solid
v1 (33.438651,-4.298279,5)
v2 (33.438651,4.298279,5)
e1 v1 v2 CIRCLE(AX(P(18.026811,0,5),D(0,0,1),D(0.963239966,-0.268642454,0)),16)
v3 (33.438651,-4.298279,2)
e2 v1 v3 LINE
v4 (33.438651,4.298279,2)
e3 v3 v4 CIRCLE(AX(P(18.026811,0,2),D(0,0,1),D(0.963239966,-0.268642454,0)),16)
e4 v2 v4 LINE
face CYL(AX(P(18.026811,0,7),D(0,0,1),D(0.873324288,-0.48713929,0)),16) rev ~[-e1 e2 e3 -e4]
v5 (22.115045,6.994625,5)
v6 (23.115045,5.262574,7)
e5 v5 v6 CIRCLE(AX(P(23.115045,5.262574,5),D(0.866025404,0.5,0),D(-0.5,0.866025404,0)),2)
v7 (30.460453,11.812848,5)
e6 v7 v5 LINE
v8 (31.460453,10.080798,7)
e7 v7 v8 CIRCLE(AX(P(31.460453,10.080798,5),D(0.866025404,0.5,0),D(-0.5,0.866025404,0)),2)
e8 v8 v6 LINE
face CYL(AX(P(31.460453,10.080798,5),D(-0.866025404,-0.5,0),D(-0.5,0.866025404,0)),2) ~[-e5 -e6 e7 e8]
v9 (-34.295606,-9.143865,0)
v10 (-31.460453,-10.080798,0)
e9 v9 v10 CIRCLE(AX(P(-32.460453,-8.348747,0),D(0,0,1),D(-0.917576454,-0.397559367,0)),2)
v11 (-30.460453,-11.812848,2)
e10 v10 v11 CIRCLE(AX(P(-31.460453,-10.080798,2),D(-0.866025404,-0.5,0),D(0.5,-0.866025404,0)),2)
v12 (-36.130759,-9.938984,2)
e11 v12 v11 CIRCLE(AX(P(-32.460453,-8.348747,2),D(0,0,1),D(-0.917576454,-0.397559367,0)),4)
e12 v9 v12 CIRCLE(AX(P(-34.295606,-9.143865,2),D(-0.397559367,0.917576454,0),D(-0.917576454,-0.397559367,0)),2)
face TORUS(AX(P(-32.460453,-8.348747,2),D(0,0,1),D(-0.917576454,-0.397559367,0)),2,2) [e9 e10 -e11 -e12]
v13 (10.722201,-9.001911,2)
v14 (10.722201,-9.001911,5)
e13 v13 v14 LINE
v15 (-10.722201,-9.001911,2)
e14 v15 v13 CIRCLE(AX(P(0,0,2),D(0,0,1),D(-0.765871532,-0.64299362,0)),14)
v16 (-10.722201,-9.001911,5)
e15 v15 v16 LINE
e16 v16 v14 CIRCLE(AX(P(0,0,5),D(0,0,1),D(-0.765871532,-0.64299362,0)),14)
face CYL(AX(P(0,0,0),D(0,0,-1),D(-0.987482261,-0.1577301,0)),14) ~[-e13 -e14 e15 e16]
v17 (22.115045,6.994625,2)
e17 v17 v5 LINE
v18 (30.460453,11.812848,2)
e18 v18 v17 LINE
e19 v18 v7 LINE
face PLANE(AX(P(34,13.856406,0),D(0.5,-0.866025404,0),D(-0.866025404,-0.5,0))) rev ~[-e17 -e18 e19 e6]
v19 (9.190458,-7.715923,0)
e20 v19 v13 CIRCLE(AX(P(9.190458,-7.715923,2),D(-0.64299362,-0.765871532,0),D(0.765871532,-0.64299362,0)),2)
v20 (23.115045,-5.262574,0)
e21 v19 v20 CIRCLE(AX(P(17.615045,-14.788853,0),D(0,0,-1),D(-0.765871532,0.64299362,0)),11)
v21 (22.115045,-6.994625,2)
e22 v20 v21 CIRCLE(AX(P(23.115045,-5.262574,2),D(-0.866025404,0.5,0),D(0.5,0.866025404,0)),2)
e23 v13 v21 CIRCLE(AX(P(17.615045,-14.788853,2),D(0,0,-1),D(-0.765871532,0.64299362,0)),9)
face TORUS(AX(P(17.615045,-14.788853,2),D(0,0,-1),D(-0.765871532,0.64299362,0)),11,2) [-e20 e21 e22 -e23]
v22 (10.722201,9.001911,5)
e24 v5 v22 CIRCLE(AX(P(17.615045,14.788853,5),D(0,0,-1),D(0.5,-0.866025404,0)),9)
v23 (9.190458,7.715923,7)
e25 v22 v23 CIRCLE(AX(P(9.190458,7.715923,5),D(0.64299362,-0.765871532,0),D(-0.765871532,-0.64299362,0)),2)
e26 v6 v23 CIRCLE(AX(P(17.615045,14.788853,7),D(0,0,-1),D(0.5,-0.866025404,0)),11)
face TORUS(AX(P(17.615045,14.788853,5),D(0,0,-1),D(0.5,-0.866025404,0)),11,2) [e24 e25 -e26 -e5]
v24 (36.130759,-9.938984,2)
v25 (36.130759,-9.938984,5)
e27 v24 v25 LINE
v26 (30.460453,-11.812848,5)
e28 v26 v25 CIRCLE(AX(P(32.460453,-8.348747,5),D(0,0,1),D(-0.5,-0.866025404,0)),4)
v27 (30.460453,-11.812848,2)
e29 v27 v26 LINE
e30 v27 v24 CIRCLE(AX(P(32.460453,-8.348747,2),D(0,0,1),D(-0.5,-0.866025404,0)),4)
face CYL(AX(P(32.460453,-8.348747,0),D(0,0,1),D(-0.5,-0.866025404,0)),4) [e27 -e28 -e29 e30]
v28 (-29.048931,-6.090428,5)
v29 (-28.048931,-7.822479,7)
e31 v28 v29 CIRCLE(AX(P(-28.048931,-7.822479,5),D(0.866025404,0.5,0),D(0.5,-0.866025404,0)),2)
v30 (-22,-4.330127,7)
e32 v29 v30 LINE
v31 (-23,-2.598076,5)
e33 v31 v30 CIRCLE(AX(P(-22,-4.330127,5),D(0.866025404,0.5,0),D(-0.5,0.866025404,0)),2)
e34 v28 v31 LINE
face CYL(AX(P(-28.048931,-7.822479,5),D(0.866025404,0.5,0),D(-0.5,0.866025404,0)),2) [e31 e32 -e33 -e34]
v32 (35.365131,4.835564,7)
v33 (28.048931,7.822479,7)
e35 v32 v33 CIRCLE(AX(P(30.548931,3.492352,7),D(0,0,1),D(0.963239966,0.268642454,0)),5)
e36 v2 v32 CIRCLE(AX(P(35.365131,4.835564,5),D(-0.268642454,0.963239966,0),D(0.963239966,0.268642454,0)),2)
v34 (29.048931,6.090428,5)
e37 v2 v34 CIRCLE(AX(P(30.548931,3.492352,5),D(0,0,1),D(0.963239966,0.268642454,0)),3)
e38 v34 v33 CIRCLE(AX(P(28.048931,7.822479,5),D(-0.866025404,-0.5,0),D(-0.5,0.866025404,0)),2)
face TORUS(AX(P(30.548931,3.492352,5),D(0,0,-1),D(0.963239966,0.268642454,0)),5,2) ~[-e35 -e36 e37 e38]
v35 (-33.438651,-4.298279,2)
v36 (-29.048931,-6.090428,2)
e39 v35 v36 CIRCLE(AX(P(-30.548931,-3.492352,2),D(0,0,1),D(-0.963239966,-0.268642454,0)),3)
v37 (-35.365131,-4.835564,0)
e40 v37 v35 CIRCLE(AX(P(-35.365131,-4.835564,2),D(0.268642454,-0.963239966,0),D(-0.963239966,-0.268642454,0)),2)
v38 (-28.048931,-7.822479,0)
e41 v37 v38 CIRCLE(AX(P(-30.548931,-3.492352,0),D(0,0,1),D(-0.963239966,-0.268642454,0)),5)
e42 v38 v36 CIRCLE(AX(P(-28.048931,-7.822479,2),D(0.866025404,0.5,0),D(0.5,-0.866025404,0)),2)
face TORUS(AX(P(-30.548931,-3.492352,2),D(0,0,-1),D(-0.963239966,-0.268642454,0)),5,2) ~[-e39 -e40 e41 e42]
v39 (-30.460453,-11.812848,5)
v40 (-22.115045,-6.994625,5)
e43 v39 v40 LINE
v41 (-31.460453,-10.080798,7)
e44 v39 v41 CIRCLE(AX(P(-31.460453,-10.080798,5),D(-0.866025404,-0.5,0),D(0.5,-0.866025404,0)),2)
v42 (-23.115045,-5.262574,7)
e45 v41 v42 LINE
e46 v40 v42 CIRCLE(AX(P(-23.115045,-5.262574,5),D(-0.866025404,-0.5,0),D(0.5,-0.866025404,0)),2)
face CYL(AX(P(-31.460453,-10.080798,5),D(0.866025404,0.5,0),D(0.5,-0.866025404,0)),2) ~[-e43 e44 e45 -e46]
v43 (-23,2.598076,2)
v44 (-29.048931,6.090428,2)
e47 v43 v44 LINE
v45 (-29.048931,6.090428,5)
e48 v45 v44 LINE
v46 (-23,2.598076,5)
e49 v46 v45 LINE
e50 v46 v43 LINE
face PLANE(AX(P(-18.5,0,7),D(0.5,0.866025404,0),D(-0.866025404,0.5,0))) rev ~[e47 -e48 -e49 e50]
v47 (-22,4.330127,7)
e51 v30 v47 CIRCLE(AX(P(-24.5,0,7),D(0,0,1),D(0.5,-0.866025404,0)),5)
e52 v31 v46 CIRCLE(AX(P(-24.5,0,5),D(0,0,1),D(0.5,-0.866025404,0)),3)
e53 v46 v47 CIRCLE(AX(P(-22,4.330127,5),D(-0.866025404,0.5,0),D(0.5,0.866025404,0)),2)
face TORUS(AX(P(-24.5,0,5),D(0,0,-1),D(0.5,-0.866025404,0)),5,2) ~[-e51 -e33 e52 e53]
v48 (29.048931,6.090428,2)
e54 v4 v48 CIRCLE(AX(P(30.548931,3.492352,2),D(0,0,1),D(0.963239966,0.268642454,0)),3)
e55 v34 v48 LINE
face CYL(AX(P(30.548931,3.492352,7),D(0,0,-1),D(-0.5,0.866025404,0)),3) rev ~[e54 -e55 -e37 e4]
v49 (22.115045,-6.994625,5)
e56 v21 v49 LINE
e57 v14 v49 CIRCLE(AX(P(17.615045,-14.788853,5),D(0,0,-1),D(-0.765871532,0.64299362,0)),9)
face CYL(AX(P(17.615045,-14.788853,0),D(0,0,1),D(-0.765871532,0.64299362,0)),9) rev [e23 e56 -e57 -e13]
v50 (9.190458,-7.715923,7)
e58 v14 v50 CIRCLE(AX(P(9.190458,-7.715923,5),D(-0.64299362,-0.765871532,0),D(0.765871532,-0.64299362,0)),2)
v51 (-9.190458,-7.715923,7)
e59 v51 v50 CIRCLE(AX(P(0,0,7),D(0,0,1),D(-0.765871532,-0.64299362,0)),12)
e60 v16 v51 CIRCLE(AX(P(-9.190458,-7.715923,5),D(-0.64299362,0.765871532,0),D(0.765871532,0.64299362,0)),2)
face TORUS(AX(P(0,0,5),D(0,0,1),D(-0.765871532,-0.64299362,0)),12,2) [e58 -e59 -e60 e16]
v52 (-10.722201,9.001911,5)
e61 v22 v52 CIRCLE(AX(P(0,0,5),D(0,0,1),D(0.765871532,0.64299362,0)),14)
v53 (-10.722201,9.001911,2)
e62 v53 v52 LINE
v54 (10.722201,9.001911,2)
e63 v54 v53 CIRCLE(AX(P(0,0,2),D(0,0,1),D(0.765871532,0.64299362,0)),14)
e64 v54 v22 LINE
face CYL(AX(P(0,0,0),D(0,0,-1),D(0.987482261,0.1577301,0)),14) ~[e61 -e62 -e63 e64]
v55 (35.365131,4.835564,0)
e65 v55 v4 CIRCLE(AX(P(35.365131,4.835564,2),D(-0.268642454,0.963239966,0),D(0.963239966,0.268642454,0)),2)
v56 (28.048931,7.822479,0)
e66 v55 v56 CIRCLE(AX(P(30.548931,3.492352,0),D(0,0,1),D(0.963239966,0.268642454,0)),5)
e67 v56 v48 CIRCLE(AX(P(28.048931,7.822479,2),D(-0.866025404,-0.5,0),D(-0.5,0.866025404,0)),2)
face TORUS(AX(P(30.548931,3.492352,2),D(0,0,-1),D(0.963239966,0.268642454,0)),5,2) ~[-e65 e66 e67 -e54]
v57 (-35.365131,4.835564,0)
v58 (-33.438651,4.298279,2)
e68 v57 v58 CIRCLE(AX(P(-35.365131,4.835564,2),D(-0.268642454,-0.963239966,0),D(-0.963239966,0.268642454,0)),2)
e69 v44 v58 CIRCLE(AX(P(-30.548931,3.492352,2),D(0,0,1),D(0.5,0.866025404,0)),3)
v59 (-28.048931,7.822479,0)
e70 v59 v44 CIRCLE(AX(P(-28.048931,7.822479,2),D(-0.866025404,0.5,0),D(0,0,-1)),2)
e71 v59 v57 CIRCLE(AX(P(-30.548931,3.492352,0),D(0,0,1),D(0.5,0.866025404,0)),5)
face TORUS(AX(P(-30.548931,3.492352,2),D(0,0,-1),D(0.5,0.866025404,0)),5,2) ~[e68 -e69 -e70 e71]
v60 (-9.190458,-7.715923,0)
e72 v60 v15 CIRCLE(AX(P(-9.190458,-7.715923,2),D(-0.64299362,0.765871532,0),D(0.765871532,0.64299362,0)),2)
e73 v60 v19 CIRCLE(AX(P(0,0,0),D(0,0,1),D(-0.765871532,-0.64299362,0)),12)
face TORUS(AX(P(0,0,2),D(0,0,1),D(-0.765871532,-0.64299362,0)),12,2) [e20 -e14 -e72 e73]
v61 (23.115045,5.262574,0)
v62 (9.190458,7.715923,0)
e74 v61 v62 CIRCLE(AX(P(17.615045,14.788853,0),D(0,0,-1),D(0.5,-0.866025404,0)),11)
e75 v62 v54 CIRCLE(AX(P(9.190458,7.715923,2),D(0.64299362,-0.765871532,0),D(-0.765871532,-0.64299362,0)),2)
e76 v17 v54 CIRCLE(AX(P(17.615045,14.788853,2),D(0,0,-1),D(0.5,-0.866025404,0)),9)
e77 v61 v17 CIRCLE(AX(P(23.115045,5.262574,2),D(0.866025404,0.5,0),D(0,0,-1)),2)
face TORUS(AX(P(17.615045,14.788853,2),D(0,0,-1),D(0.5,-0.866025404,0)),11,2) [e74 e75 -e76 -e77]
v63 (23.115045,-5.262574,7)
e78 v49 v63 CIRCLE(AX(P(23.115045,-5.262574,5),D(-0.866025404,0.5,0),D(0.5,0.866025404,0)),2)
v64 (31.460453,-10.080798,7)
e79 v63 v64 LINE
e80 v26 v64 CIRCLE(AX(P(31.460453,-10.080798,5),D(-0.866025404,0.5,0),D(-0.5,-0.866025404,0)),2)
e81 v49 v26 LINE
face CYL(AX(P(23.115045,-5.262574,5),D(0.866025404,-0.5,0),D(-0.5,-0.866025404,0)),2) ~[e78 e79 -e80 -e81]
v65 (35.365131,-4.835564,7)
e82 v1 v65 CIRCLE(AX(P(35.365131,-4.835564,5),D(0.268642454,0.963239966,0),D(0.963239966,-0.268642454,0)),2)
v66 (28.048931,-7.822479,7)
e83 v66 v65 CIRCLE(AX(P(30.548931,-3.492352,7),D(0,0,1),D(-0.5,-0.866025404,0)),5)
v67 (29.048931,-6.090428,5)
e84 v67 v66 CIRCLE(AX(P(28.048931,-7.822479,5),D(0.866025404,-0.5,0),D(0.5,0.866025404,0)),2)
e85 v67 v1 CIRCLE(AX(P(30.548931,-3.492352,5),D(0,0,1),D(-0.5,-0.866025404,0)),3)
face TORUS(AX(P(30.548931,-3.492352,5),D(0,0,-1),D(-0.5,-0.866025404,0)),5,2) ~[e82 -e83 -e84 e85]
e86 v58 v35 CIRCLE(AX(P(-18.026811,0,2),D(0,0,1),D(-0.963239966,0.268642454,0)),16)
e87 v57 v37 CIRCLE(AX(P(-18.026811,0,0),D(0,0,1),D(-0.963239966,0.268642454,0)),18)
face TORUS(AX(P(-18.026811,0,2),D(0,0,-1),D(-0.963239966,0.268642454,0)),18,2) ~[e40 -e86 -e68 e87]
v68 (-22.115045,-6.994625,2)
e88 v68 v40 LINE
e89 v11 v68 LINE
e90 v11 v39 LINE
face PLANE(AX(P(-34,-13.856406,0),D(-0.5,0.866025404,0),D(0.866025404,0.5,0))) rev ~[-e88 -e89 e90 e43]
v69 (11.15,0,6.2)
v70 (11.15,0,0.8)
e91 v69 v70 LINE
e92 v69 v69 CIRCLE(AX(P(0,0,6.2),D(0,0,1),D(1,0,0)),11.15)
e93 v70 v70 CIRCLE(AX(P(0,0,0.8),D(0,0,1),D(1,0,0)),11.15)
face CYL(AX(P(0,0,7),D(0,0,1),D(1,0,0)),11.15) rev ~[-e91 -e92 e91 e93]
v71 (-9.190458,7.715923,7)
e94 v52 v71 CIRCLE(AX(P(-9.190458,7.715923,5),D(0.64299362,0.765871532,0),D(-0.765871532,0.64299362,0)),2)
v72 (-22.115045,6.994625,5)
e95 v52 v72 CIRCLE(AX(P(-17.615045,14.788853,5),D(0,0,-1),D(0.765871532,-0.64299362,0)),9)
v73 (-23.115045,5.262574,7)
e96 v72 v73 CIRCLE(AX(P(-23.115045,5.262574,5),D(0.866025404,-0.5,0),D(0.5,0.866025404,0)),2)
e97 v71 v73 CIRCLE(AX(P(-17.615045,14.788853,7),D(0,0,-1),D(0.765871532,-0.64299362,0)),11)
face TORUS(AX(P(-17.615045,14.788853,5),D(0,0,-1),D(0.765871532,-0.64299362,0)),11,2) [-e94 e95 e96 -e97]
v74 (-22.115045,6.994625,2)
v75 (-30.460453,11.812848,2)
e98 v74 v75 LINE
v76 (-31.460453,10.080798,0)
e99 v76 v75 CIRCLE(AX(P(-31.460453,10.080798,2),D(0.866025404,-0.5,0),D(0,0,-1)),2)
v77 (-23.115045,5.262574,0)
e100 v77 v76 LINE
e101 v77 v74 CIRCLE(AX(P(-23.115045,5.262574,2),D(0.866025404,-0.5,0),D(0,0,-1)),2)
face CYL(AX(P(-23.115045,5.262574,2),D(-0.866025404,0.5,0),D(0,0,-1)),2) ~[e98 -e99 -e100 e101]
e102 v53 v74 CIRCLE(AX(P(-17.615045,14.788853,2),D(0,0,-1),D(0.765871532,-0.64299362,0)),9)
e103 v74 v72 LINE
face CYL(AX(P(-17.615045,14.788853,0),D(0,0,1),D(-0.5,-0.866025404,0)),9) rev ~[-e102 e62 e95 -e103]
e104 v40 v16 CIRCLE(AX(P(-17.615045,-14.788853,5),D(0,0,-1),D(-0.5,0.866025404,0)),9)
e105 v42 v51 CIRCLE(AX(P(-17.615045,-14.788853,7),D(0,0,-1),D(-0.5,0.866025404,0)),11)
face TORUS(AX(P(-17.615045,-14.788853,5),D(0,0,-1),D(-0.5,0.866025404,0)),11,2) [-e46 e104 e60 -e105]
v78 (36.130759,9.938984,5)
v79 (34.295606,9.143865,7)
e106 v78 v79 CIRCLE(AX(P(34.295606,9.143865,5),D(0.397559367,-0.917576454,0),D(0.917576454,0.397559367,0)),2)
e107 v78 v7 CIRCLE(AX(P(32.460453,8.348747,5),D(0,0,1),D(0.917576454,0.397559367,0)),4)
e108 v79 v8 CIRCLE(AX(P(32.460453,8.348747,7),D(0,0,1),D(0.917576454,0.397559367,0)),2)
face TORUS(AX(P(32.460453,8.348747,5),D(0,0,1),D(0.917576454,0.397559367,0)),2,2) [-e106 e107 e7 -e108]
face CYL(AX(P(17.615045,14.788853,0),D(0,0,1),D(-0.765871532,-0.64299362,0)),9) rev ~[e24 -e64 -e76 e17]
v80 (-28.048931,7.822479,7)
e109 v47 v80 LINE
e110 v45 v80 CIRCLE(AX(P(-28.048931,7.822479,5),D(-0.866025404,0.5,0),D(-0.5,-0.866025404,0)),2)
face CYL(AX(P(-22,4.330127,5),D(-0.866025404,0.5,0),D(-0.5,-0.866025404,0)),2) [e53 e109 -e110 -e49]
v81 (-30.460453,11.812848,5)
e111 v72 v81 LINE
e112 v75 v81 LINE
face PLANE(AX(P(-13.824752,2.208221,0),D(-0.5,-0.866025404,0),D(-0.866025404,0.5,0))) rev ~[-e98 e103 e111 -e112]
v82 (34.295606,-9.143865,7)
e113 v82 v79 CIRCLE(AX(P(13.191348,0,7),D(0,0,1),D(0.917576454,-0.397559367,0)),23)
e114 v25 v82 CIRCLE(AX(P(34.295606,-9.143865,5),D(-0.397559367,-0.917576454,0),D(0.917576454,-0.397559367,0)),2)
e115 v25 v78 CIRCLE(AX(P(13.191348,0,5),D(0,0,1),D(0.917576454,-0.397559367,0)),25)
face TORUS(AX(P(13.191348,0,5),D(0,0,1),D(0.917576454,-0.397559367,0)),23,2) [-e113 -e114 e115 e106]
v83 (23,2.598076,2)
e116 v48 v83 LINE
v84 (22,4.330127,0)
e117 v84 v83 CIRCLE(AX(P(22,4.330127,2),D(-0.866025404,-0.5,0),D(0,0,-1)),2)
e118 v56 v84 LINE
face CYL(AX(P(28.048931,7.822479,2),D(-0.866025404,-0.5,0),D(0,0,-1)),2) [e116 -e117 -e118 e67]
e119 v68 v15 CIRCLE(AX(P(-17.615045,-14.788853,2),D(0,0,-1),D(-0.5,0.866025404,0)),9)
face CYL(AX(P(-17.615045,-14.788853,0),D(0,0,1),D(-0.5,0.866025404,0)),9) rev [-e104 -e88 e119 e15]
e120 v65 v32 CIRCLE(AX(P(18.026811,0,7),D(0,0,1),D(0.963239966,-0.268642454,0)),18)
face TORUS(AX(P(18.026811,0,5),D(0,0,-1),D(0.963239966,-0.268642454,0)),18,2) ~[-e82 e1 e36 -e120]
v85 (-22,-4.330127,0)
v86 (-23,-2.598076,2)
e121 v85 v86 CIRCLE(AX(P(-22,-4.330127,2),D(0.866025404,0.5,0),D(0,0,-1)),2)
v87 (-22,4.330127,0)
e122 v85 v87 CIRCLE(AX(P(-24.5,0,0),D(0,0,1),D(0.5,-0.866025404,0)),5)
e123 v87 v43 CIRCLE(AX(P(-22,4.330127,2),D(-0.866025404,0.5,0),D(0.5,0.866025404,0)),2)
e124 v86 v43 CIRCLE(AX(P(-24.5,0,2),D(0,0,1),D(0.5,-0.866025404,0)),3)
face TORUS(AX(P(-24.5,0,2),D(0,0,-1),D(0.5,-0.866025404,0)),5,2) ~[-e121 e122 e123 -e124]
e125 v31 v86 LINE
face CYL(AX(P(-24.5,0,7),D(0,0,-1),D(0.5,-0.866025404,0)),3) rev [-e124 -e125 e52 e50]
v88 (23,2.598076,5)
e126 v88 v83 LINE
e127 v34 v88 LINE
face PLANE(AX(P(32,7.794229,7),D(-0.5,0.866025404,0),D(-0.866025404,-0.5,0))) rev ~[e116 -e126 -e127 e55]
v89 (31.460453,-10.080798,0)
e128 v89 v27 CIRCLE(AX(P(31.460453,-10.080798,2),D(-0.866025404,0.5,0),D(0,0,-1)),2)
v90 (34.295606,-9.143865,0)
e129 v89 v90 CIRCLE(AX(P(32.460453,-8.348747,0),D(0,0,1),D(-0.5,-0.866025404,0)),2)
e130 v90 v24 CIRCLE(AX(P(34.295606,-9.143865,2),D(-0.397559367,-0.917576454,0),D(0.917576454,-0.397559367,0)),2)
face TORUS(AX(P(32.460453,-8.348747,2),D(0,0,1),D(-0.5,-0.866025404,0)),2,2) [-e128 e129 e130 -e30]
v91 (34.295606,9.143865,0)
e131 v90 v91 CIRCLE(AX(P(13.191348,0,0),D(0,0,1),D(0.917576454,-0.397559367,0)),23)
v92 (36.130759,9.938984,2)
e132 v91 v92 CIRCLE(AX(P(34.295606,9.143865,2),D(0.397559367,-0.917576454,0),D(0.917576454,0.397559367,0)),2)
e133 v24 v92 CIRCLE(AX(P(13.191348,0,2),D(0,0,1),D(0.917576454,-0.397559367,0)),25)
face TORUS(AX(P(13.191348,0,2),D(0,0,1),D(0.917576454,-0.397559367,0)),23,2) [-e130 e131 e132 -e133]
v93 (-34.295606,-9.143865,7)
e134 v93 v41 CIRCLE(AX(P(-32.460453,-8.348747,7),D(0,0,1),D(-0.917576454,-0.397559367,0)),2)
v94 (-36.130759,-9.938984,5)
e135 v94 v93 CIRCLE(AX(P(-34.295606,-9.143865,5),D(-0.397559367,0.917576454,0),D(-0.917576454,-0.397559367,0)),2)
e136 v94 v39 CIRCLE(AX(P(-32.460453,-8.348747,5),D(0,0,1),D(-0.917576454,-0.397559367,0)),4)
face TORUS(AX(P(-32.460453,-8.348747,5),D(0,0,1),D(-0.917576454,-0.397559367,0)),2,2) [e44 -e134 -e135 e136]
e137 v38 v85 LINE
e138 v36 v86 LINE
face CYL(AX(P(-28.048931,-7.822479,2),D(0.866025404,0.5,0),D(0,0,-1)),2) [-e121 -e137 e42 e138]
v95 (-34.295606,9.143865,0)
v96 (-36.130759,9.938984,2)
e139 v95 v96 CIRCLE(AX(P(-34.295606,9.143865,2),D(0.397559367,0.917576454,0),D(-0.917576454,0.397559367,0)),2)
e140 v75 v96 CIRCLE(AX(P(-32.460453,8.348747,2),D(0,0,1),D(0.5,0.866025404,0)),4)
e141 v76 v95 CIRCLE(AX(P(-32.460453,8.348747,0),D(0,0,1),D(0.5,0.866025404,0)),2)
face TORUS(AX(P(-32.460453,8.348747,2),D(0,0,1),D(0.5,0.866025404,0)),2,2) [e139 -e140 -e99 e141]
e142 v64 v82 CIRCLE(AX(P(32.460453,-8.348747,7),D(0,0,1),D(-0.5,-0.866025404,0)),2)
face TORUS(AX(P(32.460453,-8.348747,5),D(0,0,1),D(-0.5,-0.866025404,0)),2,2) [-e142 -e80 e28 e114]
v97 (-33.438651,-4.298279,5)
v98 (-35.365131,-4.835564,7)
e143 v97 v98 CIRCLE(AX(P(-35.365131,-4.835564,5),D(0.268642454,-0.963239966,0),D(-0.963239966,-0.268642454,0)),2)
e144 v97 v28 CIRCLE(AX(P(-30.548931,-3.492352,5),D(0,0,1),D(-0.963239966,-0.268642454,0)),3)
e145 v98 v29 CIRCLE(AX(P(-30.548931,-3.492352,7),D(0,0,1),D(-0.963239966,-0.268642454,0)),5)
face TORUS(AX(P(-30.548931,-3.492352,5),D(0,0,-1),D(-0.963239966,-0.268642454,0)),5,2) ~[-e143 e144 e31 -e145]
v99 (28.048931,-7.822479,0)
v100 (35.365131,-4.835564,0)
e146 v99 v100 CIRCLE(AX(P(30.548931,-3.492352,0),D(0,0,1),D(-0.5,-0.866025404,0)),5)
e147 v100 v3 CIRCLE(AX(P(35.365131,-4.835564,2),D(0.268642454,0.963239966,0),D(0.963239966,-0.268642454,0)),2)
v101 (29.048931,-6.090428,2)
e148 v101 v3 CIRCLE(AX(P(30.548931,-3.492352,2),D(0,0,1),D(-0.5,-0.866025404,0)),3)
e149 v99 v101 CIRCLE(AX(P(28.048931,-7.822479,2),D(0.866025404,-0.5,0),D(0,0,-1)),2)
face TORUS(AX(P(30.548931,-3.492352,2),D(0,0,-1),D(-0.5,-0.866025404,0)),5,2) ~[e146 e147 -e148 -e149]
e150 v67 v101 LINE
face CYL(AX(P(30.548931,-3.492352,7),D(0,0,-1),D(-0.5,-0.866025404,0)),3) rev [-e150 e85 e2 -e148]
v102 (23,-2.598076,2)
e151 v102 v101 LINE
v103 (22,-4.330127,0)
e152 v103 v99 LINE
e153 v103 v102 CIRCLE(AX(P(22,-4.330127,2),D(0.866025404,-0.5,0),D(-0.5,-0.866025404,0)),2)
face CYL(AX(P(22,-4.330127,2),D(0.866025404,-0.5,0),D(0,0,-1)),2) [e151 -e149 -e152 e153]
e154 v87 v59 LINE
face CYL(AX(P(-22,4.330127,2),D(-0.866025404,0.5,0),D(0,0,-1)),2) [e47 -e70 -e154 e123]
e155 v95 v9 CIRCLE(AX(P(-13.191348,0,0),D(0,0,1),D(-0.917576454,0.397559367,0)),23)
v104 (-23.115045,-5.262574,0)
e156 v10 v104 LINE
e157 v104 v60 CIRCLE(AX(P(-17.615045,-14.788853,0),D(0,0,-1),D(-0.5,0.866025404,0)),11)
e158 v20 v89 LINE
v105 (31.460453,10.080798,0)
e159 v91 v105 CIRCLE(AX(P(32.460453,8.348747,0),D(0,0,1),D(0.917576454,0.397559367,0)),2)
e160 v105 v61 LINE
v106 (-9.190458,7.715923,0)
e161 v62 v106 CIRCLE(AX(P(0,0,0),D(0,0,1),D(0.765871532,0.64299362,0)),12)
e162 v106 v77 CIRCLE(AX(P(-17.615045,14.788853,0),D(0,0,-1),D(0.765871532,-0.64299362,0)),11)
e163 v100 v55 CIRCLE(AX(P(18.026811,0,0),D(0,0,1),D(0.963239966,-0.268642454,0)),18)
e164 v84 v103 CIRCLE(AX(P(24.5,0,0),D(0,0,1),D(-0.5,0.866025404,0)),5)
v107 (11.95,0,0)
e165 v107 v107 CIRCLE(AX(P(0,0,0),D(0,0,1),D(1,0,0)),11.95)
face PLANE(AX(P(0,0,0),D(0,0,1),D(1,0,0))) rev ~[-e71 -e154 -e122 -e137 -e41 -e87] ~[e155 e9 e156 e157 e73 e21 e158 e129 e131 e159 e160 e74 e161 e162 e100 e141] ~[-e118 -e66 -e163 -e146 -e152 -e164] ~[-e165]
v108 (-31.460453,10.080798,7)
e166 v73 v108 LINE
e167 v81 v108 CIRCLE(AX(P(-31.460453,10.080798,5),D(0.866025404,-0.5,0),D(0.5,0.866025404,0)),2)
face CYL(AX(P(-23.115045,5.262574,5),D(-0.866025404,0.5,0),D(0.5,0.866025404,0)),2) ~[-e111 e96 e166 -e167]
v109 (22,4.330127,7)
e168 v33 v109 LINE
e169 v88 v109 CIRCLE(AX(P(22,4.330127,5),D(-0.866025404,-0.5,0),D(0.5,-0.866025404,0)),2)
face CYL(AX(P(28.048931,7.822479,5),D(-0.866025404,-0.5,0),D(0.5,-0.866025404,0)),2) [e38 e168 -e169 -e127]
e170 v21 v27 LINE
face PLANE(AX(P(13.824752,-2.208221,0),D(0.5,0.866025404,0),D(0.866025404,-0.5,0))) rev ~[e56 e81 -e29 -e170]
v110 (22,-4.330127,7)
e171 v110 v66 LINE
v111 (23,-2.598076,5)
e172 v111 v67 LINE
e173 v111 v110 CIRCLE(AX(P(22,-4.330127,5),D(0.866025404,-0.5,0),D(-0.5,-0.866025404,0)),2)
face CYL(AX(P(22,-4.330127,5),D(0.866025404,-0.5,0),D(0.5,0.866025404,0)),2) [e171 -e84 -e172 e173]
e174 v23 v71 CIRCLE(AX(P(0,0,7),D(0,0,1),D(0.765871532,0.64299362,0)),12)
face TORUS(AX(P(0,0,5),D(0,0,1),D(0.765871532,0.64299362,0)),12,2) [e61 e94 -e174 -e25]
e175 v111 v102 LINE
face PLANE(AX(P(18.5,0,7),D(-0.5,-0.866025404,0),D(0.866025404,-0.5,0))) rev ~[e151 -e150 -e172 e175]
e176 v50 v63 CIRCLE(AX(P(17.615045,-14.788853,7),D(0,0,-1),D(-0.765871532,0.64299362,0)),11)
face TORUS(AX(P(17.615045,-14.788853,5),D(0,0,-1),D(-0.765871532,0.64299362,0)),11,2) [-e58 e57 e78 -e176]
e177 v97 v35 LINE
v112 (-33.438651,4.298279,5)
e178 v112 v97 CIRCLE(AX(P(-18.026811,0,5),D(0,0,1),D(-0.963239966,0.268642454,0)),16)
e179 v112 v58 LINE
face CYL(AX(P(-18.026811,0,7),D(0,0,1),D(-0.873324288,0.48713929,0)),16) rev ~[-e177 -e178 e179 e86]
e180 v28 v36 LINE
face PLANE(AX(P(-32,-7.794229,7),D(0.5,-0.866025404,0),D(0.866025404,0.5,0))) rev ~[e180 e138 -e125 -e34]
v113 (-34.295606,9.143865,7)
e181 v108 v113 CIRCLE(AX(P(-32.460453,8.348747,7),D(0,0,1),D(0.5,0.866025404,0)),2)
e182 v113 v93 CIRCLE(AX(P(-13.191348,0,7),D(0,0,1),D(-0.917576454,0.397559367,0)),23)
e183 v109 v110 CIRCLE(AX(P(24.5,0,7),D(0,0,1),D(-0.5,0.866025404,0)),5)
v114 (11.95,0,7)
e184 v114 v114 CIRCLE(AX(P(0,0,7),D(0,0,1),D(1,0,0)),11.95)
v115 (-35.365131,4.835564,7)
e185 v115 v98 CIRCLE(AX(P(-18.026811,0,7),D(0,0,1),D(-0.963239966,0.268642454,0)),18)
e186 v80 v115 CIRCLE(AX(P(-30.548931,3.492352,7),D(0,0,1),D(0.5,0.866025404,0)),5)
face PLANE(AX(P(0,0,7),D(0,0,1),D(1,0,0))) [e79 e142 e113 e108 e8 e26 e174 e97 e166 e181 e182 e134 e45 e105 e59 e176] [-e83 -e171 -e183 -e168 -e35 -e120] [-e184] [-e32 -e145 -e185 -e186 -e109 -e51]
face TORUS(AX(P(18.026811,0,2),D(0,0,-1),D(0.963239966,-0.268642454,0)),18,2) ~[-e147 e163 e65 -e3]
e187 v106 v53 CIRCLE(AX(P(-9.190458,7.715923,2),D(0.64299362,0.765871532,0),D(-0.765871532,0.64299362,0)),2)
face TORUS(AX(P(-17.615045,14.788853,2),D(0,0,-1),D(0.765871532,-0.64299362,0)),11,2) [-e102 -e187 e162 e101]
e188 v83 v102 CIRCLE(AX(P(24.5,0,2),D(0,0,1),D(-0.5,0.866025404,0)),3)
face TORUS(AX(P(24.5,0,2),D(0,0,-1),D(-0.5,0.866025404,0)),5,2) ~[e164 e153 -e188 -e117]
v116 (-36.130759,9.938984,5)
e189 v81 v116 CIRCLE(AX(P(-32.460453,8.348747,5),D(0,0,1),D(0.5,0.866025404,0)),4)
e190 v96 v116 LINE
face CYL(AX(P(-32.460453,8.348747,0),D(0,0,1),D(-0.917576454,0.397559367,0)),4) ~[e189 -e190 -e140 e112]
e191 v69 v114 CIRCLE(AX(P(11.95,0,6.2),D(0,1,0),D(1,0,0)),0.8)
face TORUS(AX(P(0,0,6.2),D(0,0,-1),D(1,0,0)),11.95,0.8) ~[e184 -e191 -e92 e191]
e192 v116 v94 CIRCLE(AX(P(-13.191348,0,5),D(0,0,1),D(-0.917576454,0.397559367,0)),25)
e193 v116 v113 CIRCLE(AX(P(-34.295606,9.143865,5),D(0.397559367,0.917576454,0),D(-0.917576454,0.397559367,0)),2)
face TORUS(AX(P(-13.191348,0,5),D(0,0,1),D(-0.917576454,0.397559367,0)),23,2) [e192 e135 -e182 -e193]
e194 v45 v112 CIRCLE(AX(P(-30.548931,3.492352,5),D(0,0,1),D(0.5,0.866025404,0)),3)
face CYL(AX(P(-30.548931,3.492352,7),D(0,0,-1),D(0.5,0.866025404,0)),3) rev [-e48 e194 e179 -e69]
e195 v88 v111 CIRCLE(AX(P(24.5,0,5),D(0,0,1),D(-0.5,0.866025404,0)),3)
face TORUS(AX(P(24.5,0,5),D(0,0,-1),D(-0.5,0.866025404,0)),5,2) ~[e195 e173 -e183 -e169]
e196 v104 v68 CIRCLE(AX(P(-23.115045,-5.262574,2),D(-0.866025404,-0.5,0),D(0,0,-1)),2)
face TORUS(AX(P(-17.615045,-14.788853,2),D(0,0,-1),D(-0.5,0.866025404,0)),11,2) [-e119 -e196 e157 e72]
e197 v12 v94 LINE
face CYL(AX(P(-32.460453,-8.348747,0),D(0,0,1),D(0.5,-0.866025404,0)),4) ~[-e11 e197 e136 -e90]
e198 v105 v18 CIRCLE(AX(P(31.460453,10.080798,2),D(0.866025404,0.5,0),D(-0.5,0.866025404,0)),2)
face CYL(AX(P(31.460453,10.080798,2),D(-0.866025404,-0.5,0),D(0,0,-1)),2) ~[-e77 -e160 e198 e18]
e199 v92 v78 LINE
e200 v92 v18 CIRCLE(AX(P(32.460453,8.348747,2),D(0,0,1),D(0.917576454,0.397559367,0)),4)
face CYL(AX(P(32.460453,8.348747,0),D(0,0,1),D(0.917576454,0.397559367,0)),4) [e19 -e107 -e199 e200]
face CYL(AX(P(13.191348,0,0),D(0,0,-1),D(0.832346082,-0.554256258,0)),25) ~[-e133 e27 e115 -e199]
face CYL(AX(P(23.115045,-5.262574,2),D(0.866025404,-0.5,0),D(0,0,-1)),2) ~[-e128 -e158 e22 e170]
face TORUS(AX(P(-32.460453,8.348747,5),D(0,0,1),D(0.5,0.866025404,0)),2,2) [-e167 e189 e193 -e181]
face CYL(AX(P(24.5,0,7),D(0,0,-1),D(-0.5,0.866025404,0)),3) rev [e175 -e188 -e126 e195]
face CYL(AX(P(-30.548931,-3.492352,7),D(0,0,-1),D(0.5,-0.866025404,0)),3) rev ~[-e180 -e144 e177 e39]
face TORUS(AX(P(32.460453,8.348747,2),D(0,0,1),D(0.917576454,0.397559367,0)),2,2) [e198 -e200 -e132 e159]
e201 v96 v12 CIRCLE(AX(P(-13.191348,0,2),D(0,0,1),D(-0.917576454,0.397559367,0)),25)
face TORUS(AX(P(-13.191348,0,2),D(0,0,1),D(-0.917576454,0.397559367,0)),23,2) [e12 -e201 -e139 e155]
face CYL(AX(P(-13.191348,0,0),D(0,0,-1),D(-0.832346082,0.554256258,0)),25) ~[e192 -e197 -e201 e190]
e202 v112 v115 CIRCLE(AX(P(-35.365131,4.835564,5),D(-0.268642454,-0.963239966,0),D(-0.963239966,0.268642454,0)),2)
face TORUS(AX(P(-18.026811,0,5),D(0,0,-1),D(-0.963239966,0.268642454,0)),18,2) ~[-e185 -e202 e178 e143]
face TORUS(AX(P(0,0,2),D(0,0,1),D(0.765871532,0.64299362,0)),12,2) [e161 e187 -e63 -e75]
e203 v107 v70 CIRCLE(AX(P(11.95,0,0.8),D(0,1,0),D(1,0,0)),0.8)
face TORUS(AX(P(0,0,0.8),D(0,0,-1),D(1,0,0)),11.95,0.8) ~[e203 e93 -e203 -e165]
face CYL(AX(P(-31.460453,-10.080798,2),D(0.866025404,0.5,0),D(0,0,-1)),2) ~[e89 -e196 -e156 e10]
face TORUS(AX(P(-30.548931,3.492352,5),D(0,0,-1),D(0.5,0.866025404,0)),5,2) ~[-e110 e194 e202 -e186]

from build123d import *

# Parameters (mm, degrees)
F1_DEPTH = 7
F2_R     = 11.15
F3_DEPTH = 7.001
F4_R     = 9
F5_R     = 4
F7_DEPTH = 7.001
F8_R     = 3
F9_R     = 0.8
F10_R    = 2


with BuildPart() as f1:
    # F0 (on Top) → F1 (new body)
    with BuildSketch(Plane.XY):
        with BuildLine():
            Line((-34, -13.8564064606), (-13.8247516529, -2.2082213964))
            ThreePointArc((-13.8247516529, -2.2082213964), (0, -14), (13.8247516529, -2.2082213964))
            Line((13.8247516529, -2.2082213964), (34, -13.8564064606))
            ThreePointArc((34, -13.8564064606), (38.1913479533, 0), (34, 13.8564064606))
            Line((34, 13.8564064606), (13.8247516529, 2.2082213964))
            ThreePointArc((13.8247516529, 2.2082213964), (0, 14), (-13.8247516529, 2.2082213964))
            Line((-13.8247516529, 2.2082213964), (-34, 13.8564064606))
            ThreePointArc((-34, 13.8564064606), (-38.1913479533, 0), (-34, -13.8564064606))
        make_face()
    extrude(amount=F1_DEPTH)

    # F2 (on face) → F3 (cut, through all)
    with BuildSketch(Plane.XY.offset(7)):
        Circle(F2_R)
    extrude(amount=-F3_DEPTH, mode=Mode.SUBTRACT)

    # F4
    f4_edges = [f1.edges().sort_by_distance(p)[0] for p in [
        (-13.824752, -2.208221, 3.5),
        (13.824752, -2.208221, 3.5),
        (13.824752, 2.208221, 3.5),
        (-13.824752, 2.208221, 3.5),
    ]]
    fillet(f4_edges, radius=F4_R)

    # F5
    f5_edges = [f1.edges().sort_by_distance(p)[0] for p in [
        (-34, 13.856406, 3.5),
        (-34, -13.856406, 3.5),
        (34, 13.856406, 3.5),
        (34, -13.856406, 3.5),
    ]]
    fillet(f5_edges, radius=F5_R)

    # F6 (on face) → F7 (cut, through all)
    with BuildSketch(Plane.XY.offset(7)):
        with BuildLine():
            Line((-32, -7.7942286341), (-18.5, 0))
            Line((-18.5, 0), (-32, 7.7942286341))
            ThreePointArc((-32, 7.7942286341), (-34.0268113875, 0), (-32, -7.7942286341))
        make_face()
        with BuildLine():
            Line((32, 7.7942286341), (18.5, 0))
            Line((18.5, 0), (32, -7.7942286341))
            ThreePointArc((32, -7.7942286341), (34.0268113875, 0), (32, 7.7942286341))
        make_face()
    extrude(amount=-F7_DEPTH, mode=Mode.SUBTRACT)

    # F8
    f8_edges = [f1.edges().sort_by_distance(p)[0] for p in [
        (-18.5, 0, 3.5),
        (18.5, 0, 3.5),
        (-32, -7.794229, 3.5),
        (-32, 7.794229, 3.5),
        (32, 7.794229, 3.5),
        (32, -7.794229, 3.5),
    ]]
    fillet(f8_edges, radius=F8_R)

    # F9
    f9_edges = [f1.edges().sort_by_distance(p)[0] for p in [
        (-11.15, 0, 7),
        (11.15, 0, 3.5),
        (-11.15, 0, 0),
    ]]
    fillet(f9_edges, radius=F9_R)

    # F10
    f10_edges = [f1.edges().sort_by_distance(p)[0] for p in [
        (-11.95, 0, 7),
        (-34.026811, 0, 7),
        (-31.682853, 6.2698, 7),
        (-31.682853, -6.2698, 7),
        (-26.024465, 4.344252, 7),
        (-26.024465, -4.344252, 7),
        (-21.5, 0, 7),
        (-26.287749, 9.403736, 7),
        (-33.715572, 12.14673, 7),
        (-16.053404, 5.925373, 7),
        (-38.191348, 0, 7),
        (0, 14, 7),
        (-33.715572, -12.14673, 7),
        (16.053404, 5.925373, 7),
        (-26.287749, -9.403736, 7),
        (26.287749, 9.403736, 7),
        (-16.053404, -5.925373, 7),
        (33.715572, 12.14673, 7),
        (0, -14, 7),
        (38.191348, 0, 7),
        (16.053404, -5.925373, 7),
        (33.715572, -12.14673, 7),
        (26.287749, -9.403736, 7),
        (34.026811, 0, 7),
        (31.682853, -6.2698, 7),
        (31.682853, 6.2698, 7),
        (26.024465, -4.344252, 7),
        (26.024465, 4.344252, 7),
        (21.5, 0, 7),
        (-11.95, 0, 0),
        (-34.026811, 0, 0),
        (-31.682853, 6.2698, 0),
        (-31.682853, -6.2698, 0),
        (-26.024465, 4.344252, 0),
        (-26.024465, -4.344252, 0),
        (-21.5, 0, 0),
        (-26.287749, 9.403736, 0),
        (-33.715572, 12.14673, 0),
        (-16.053404, 5.925373, 0),
        (-38.191348, 0, 0),
        (0, 14, 0),
        (-33.715572, -12.14673, 0),
        (16.053404, 5.925373, 0),
        (-26.287749, -9.403736, 0),
        (26.287749, 9.403736, 0),
        (-16.053404, -5.925373, 0),
        (33.715572, 12.14673, 0),
        (0, -14, 0),
        (38.191348, 0, 0),
        (16.053404, -5.925373, 0),
        (33.715572, -12.14673, 0),
        (26.287749, -9.403736, 0),
        (34.026811, 0, 0),
        (31.682853, -6.2698, 0),
        (31.682853, 6.2698, 0),
        (26.024465, -4.344252, 0),
        (26.024465, 4.344252, 0),
        (21.5, 0, 0),
    ]]
    fillet(f10_edges, radius=F10_R)


solid = f1.part
